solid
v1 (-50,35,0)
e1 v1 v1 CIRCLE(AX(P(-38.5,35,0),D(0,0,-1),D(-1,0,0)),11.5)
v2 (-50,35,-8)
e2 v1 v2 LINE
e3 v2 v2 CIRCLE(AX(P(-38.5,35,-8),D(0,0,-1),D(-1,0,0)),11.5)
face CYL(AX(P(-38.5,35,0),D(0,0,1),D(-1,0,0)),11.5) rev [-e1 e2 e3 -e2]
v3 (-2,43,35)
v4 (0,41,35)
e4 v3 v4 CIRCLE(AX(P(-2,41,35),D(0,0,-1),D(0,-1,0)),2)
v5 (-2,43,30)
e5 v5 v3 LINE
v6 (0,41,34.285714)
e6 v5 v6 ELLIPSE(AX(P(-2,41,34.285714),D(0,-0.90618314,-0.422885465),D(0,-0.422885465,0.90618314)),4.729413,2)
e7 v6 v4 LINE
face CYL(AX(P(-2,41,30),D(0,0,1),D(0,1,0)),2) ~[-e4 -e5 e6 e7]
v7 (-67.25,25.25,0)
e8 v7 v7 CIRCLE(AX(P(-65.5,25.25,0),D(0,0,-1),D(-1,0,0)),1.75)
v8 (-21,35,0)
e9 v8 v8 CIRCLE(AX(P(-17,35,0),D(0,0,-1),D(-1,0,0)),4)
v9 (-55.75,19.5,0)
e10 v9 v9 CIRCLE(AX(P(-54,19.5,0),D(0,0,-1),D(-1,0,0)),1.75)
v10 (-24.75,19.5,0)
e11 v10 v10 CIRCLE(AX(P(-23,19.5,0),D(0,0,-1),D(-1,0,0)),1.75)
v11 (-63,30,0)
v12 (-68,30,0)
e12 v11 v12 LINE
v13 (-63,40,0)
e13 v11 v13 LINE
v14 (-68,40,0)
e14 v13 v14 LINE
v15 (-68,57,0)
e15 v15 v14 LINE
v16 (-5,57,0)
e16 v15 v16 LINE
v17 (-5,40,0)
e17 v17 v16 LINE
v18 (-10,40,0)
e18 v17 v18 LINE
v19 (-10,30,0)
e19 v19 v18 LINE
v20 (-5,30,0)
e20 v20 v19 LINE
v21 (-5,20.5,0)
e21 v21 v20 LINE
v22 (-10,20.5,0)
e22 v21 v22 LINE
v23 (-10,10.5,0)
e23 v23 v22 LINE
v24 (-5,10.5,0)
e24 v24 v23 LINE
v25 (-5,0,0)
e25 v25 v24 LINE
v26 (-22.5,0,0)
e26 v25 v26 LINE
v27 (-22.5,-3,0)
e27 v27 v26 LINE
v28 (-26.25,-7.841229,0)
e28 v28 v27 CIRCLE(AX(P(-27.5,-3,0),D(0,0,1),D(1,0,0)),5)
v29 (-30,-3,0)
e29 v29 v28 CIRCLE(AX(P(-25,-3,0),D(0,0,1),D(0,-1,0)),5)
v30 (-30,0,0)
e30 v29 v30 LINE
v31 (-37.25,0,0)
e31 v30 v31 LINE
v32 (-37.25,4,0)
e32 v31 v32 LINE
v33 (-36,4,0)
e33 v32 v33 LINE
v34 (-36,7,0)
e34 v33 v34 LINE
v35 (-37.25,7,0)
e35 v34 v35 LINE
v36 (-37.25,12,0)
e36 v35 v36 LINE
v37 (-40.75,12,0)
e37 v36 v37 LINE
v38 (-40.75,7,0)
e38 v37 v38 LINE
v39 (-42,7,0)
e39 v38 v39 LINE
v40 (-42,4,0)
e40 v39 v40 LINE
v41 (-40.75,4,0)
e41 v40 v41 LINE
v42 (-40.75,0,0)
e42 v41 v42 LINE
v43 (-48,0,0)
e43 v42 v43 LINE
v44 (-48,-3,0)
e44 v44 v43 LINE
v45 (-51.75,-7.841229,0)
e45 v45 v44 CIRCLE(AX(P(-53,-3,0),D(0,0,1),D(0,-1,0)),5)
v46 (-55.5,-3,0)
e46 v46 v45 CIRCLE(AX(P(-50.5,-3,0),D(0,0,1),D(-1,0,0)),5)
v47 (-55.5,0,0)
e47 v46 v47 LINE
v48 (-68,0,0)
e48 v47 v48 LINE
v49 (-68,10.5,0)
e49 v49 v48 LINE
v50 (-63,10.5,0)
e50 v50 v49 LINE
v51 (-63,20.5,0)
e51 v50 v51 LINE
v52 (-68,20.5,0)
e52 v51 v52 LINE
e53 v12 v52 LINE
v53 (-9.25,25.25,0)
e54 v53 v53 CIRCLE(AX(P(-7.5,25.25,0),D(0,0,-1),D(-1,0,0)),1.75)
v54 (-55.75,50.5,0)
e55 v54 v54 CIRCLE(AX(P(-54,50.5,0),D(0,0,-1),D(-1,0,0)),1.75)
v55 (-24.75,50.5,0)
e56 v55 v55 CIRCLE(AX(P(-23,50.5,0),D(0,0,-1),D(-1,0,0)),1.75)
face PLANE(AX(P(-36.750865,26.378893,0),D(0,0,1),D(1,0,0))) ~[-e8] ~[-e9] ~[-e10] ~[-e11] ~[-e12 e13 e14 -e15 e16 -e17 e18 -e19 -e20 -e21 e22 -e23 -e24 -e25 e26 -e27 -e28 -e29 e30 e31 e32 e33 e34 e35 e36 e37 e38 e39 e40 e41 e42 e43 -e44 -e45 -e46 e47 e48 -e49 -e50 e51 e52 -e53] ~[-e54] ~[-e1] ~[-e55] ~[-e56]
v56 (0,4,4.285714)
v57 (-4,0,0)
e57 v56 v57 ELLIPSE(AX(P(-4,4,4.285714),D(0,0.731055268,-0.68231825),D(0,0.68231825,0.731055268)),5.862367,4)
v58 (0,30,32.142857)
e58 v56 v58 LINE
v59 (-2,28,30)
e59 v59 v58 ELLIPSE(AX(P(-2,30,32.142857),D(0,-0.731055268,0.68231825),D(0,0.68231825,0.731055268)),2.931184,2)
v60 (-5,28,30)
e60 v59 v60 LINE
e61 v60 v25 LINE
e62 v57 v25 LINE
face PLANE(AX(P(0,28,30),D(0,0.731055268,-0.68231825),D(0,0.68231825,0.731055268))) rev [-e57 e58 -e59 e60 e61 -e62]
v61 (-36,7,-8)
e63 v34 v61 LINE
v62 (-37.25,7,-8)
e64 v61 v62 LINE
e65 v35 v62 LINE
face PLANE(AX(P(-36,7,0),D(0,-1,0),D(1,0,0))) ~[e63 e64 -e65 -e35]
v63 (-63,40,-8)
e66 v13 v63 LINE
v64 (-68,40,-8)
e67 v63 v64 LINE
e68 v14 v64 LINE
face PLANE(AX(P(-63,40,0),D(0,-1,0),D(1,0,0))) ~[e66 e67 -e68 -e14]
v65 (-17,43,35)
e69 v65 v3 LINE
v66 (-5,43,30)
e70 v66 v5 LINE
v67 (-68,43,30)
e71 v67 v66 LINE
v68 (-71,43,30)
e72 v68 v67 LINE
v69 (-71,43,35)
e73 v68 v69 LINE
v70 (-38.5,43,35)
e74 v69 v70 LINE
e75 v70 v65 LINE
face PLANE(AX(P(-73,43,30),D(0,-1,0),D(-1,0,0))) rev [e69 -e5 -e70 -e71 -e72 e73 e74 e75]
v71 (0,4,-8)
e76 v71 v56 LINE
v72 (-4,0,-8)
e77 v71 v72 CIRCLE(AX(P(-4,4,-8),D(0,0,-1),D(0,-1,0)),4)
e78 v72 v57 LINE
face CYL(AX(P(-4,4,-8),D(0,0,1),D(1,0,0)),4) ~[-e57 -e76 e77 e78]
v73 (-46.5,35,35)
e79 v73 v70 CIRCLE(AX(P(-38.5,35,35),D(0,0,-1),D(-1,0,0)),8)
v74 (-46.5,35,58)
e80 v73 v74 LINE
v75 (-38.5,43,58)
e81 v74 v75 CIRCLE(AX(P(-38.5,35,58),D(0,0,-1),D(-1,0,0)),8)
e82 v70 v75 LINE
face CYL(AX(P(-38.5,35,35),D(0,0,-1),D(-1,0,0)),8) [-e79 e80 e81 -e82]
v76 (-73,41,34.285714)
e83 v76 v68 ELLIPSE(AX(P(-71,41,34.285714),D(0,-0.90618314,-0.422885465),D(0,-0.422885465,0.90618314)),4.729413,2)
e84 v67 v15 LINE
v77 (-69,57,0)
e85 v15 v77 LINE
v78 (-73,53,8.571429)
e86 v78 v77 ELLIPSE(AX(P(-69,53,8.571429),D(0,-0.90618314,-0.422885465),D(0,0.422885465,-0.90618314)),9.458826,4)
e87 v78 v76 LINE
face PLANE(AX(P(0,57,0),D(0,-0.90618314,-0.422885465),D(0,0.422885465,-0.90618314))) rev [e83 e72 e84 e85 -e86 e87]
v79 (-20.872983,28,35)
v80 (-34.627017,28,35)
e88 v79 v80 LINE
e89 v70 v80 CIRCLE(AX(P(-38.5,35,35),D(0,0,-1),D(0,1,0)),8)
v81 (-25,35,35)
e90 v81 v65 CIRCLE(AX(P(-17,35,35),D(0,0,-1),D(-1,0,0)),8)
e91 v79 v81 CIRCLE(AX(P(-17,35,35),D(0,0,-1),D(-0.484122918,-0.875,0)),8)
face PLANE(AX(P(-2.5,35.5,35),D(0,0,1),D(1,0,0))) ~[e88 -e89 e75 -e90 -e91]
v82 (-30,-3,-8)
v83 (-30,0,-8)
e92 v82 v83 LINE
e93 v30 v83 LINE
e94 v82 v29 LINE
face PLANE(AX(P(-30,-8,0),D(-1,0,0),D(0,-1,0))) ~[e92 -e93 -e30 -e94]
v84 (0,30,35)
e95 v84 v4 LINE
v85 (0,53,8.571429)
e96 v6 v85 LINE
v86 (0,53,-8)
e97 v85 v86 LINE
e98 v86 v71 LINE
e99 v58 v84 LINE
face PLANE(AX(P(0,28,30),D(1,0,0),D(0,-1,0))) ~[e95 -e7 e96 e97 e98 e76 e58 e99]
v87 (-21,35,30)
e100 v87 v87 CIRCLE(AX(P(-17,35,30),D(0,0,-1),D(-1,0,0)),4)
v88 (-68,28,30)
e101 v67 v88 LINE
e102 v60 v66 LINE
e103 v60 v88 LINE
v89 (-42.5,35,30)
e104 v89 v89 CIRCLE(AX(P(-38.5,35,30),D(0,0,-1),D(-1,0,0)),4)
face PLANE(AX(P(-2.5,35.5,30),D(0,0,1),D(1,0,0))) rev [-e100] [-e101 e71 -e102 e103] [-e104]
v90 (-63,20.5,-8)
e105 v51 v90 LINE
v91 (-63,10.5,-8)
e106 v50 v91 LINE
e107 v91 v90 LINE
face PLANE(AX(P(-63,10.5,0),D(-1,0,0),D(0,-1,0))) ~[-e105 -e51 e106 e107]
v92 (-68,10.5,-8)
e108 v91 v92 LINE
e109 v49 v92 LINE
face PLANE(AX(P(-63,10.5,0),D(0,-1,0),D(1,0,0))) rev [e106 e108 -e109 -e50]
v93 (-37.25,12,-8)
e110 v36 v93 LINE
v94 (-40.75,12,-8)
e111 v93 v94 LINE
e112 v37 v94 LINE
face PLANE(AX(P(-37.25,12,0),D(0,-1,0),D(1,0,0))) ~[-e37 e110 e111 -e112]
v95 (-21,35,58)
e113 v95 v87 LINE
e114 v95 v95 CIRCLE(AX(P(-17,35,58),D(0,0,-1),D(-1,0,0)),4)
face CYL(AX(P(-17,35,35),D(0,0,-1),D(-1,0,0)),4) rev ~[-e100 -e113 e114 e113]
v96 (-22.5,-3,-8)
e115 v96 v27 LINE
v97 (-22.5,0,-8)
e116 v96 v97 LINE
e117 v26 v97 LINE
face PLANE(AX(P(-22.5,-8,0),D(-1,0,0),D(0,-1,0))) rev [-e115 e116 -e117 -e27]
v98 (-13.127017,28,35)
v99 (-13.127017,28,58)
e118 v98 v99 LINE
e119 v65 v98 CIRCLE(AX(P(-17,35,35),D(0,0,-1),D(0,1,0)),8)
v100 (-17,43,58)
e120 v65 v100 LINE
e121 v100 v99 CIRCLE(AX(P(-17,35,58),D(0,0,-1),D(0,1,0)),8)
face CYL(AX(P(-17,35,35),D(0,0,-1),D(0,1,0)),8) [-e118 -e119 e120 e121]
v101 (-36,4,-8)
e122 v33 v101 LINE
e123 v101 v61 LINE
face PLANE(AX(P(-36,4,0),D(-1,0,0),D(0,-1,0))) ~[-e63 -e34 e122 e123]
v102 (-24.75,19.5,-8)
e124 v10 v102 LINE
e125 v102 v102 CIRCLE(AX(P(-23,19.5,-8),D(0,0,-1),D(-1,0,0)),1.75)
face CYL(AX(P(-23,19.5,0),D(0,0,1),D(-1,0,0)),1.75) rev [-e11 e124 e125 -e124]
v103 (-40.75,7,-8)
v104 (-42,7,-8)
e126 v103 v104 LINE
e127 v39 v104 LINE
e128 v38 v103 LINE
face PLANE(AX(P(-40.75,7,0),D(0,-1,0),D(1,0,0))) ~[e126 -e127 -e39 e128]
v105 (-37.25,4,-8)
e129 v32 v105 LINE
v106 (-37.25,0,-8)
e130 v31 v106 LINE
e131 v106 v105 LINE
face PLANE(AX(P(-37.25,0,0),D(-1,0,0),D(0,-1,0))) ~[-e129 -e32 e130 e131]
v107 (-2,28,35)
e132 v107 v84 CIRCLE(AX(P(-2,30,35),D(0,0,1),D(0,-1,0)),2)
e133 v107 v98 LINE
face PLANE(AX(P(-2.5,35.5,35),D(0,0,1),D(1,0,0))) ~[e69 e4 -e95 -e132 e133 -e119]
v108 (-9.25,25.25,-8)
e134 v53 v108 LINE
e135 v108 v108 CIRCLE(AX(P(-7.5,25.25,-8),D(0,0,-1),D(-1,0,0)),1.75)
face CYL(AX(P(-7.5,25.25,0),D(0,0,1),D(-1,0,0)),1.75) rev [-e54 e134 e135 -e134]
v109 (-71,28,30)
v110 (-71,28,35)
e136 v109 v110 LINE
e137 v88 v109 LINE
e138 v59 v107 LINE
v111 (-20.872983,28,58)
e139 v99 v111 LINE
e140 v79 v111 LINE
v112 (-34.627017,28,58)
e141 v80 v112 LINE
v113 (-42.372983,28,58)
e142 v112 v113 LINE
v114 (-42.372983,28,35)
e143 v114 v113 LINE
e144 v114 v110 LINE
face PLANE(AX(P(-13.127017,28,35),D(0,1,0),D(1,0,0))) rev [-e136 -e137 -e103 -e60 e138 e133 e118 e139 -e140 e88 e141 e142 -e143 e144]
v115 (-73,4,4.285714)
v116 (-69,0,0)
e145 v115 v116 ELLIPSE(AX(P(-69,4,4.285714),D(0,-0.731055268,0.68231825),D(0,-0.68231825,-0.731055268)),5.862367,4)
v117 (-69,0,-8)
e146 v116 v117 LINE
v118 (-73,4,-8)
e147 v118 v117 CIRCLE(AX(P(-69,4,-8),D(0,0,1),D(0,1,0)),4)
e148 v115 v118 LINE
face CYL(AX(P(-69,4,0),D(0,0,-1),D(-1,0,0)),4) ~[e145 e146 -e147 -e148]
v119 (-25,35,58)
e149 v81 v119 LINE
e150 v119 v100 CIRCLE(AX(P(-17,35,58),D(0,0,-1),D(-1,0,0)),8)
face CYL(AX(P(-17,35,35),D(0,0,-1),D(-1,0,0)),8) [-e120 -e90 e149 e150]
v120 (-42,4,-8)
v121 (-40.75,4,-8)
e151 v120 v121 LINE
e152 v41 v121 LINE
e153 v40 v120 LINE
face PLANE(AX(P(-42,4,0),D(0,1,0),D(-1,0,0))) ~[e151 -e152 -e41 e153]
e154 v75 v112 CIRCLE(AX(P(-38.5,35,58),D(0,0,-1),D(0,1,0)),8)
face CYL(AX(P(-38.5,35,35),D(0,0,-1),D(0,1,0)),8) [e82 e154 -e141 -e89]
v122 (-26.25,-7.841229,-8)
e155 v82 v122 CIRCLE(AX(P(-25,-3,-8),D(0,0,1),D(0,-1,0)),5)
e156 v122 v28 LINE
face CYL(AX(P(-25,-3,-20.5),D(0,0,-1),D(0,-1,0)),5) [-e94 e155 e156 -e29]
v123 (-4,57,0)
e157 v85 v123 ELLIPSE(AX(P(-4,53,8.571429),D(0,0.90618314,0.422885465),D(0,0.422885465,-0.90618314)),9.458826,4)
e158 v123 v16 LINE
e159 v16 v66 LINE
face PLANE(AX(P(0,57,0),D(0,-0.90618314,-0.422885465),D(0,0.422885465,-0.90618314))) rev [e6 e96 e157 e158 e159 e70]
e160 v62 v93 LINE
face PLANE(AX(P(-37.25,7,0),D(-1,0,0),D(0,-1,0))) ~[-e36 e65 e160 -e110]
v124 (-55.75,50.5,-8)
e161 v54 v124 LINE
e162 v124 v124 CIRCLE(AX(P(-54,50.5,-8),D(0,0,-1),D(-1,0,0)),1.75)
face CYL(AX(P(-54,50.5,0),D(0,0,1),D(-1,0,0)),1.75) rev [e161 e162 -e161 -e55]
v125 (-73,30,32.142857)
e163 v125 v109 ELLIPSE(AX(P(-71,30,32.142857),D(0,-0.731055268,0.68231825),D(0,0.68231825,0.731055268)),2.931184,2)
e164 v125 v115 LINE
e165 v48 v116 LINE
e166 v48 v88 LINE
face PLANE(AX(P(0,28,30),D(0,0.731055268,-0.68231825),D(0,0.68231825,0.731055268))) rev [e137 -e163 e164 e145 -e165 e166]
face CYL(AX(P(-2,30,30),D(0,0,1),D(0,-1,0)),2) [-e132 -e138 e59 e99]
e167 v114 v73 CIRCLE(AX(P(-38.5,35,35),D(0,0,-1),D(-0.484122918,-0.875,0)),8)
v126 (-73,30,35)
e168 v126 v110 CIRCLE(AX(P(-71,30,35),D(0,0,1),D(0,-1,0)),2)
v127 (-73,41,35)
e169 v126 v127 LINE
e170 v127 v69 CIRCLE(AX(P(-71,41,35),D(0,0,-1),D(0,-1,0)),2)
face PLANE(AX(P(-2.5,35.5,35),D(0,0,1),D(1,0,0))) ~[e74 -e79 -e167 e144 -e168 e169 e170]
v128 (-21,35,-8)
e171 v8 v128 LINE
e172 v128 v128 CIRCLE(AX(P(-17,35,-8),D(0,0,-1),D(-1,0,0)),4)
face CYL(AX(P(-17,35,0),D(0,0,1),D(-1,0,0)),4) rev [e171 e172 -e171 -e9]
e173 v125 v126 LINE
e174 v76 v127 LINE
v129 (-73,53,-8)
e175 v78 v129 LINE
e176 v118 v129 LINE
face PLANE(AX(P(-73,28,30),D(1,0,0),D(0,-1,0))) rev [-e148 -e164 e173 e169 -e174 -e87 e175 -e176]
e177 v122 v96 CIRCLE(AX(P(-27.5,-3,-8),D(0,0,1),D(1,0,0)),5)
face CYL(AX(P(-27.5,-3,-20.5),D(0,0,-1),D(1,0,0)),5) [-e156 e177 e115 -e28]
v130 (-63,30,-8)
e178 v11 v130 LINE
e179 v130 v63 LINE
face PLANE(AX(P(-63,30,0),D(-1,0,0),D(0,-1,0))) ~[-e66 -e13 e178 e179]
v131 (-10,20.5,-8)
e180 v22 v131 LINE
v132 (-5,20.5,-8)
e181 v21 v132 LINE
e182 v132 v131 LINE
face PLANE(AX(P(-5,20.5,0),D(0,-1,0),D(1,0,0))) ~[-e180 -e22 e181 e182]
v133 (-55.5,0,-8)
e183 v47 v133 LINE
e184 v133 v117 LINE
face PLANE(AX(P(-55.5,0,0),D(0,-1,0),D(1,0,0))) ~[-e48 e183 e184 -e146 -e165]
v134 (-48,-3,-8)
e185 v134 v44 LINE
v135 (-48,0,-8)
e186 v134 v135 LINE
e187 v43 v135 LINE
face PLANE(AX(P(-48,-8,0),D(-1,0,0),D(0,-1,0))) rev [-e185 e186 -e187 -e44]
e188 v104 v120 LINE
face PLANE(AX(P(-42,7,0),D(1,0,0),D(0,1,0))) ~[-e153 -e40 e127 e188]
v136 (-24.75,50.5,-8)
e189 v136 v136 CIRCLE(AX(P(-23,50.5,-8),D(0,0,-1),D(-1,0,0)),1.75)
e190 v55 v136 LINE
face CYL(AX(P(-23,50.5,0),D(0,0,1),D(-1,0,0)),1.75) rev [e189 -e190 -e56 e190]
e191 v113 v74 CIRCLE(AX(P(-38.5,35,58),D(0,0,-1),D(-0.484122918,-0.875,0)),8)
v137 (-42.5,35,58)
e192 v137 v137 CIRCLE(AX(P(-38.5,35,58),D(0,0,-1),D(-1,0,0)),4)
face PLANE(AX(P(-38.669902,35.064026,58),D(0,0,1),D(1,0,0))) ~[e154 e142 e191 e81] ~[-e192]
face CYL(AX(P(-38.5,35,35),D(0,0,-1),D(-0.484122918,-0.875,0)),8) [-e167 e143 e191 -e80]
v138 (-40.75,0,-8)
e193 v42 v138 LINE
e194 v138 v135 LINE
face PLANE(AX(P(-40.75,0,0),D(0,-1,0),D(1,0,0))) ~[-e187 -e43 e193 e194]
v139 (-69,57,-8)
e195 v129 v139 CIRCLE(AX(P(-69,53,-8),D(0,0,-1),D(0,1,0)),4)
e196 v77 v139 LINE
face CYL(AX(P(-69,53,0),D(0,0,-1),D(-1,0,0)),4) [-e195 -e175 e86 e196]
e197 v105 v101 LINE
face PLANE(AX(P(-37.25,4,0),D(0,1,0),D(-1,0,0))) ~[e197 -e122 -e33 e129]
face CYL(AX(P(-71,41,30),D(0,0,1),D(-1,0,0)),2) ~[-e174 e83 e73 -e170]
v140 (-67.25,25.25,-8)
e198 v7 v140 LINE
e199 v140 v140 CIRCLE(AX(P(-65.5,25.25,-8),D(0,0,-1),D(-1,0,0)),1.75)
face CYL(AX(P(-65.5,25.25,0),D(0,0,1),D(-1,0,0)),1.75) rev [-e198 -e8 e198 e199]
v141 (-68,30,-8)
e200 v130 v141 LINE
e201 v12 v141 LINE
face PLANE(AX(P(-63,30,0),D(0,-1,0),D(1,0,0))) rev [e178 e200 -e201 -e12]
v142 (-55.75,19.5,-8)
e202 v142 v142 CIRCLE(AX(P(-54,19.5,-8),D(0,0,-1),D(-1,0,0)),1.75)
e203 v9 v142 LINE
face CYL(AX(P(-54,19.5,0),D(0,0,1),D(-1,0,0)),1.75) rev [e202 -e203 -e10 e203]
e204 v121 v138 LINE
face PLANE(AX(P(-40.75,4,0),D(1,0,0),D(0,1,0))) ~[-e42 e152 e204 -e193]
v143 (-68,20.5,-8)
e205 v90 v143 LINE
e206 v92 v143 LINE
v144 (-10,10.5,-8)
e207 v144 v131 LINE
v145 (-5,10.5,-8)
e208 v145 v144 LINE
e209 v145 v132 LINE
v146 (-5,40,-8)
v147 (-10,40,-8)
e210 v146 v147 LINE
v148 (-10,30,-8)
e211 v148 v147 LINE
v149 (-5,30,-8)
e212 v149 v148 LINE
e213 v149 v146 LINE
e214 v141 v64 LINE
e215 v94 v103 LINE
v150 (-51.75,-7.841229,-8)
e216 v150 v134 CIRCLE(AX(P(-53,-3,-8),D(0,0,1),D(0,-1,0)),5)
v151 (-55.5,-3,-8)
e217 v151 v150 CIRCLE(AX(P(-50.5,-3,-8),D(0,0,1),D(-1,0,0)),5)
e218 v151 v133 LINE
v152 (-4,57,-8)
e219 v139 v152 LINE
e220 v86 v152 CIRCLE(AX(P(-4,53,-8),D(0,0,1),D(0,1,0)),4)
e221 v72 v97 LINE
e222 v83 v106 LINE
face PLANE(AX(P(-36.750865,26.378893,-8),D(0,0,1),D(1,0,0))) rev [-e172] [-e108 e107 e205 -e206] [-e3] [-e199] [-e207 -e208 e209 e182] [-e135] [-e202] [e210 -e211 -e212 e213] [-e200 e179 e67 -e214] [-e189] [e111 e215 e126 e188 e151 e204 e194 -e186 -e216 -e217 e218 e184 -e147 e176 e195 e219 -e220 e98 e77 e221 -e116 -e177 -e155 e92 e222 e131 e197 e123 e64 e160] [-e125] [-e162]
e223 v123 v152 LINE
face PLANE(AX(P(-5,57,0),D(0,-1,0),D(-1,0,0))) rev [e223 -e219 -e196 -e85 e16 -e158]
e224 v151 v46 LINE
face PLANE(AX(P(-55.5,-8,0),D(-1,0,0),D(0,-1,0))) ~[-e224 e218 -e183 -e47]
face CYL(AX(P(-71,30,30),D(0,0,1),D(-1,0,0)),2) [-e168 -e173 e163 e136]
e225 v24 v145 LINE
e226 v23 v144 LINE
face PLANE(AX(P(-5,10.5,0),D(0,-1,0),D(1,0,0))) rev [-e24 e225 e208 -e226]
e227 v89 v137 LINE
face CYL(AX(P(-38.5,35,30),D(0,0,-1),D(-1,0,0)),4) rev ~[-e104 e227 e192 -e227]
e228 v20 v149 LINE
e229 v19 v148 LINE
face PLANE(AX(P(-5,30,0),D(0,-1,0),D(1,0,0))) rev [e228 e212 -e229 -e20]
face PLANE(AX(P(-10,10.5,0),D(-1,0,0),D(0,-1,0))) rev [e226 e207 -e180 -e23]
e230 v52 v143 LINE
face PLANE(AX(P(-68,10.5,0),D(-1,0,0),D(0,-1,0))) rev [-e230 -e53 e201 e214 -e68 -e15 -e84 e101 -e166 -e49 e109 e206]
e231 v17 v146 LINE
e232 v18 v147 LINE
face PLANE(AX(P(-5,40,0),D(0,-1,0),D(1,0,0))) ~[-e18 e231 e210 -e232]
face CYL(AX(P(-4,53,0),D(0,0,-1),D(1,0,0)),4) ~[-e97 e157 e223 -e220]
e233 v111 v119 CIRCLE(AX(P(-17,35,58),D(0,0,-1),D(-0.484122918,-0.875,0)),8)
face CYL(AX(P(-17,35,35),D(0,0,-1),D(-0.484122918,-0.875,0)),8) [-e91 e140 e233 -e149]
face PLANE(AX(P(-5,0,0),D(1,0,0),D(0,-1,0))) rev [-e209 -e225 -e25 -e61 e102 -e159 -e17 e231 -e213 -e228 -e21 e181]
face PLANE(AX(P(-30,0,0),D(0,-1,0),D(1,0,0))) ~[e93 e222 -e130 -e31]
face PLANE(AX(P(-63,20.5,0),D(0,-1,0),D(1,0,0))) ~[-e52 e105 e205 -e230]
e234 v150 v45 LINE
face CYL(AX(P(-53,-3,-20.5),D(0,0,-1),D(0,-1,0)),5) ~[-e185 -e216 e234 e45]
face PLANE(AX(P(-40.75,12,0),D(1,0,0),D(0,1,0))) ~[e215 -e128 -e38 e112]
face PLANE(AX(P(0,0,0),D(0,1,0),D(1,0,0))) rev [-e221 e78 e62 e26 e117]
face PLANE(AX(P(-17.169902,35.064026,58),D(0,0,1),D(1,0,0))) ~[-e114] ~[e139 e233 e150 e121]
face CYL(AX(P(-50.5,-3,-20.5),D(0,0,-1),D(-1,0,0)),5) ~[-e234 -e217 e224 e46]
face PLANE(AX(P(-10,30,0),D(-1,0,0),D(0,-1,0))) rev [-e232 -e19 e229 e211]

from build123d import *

# Parameters (mm, degrees)
F0_W         = 5
F0_H         = 10
F0_R         = 1.75
F0_R_2       = 4
F0_R_3       = 11.5
F0_W_2       = 7.5
F0_H_2       = 8
F1_DEPTH     = 8
F3_DEPTH     = 30
F4_W         = 5
F4_H         = 15
F4_W_2       = 63
F4_R         = 4
F5_DEPTH     = 5
F6_R         = 4
F7_DEPTH     = 23
F9_DEPTH     = 73
F10_R        = 4
F11_R        = 2
F12_T1_DEPTH = 33


# Not quite as in the source:
# - a fillet or chamfer that OpenCascade refuses, or shapes differently, is made with other operations: its cross-section is extruded or revolved along the edge and cut away or added


with BuildPart() as f1:
    # F0 (on Top) → F1 (new body)
    with BuildSketch(Plane.XY):
        Polygon((0, 57), (0, 0), (22.5, 0), (30, 0), (37.25, 0), (37.25, 4), (36, 4), (36, 7), (37.25, 7), (37.25, 12), (40.75, 12), (40.75, 7), (42, 7), (42, 4), (40.75, 4), (40.75, 0), (48, 0), (55.5, 0), (73, 0), (73, 57), align=None)
        with Locations((7.5, 15.5)):
            Rectangle(F0_W, F0_H, mode=Mode.SUBTRACT)
        with Locations((23, 19.5)):
            Circle(F0_R, mode=Mode.SUBTRACT)
        with Locations((54, 19.5)):
            Circle(F0_R, mode=Mode.SUBTRACT)
        with Locations((65.5, 15.5)):
            Rectangle(F0_W, F0_H, mode=Mode.SUBTRACT)
        with Locations((7.5, 25.25)):
            Circle(F0_R, mode=Mode.SUBTRACT)
        with Locations((7.5, 35)):
            Rectangle(F0_W, F0_H, mode=Mode.SUBTRACT)
        with Locations((17, 35)):
            Circle(F0_R_2, mode=Mode.SUBTRACT)
        with Locations((23, 50.5)):
            Circle(F0_R, mode=Mode.SUBTRACT)
        with Locations((38.5, 35)):
            Circle(F0_R_3, mode=Mode.SUBTRACT)
        with Locations((65.5, 25.25)):
            Circle(F0_R, mode=Mode.SUBTRACT)
        with Locations((65.5, 35)):
            Rectangle(F0_W, F0_H, mode=Mode.SUBTRACT)
        with Locations((54, 50.5)):
            Circle(F0_R, mode=Mode.SUBTRACT)
        with Locations((51.75, -4)):
            Rectangle(F0_W_2, F0_H_2)
        with Locations((26.25, -4)):
            Rectangle(F0_W_2, F0_H_2)
    extrude(amount=-F1_DEPTH)

    # F2 (on Top) → F3 (join)
    with BuildSketch(Plane.XY):
        Polygon((0, 57), (0, 0), (5, 0), (5, 10.5), (5, 20.5), (5, 30), (5, 40), (5, 57), align=None)
        Polygon((73, 57), (68, 57), (68, 40), (68, 30), (68, 20.5), (68, 10.5), (68, 0), (73, 0), align=None)
    extrude(amount=F3_DEPTH)

    # F4 (on face) → F5 (join)
    with BuildSketch(Plane.XY.offset(30)):
        with Locations((2.5, 35.5)):
            Rectangle(F4_W, F4_H)
        with Locations((36.5, 35.5)):
            Rectangle(F4_W_2, F4_H)
        with Locations((17, 35)):
            Circle(F4_R, mode=Mode.SUBTRACT)
        with Locations((38.5, 35)):
            Circle(F4_R, mode=Mode.SUBTRACT)
        with Locations((70.5, 35.5)):
            Rectangle(F4_W, F4_H)
    extrude(amount=F5_DEPTH)

    # F6 (on face) → F7 (join)
    with BuildSketch(Plane.XY.offset(35)):
        with BuildLine():
            ThreePointArc((25, 35), (22.6568542495, 40.6568542495), (17, 43))
            ThreePointArc((17, 43), (9.2540333076, 37), (13.1270166538, 28))
            Line((13.1270166538, 28), (20.8729833462, 28))
            ThreePointArc((20.8729833462, 28), (23.8914391374, 30.9369879873), (25, 35))
        make_face()
        with Locations((17, 35)):
            Circle(F6_R, mode=Mode.SUBTRACT)
        with BuildLine():
            ThreePointArc((46.5, 35), (44.1568542495, 40.6568542495), (38.5, 43))
            ThreePointArc((38.5, 43), (30.7540333076, 37), (34.6270166538, 28))
            Line((34.6270166538, 28), (42.3729833462, 28))
            ThreePointArc((42.3729833462, 28), (45.3914391374, 30.9369879873), (46.5, 35))
        make_face()
        with Locations((38.5, 35)):
            Circle(F6_R, mode=Mode.SUBTRACT)
    extrude(amount=F7_DEPTH)

    # F8 (on face) → F9 (cut)
    with BuildSketch(Plane(origin=(0, 0, 0), x_dir=(0, -1, 0), z_dir=(-1, 0, 0))):
        Polygon((-57, 0), (-43, 30), (-57, 30), align=None)
        Polygon((0, 30), (-28, 30), (0, 0), align=None)
    extrude(amount=-F9_DEPTH, mode=Mode.SUBTRACT)

    # F10
    f10_edges = [f1.edges().sort_by_distance(p)[0] for p in [
        (0, 57, -4),
        (73, 57, -4),
        (0, 0, -4),
        (73, 0, -4),
    ]]
    fillet(f10_edges, radius=F10_R)

    # F11
    f11_edges = [f1.edges().sort_by_distance(p)[0] for p in [
        (73, 28, 32.5),
        (0, 28, 32.5),
        (0, 43, 32.5),
        (73, 43, 32.5),
    ]]
    fillet(f11_edges, radius=F11_R)

    # F12: fillet of radius 5 on 4 edges, made by hand

    # F12_s2 → F12_t1 (cut)
    with BuildSketch(Plane.XY.offset(-20.5)):
        with BuildLine():
            ThreePointArc((25, -8), (28.5355339059, -6.5355339059), (30, -3))
            Line((30, -3), (30, -8))
            Line((30, -8), (25, -8))
        make_face()
        with BuildLine():
            ThreePointArc((22.5, -3), (23.9644660941, -6.5355339059), (27.5, -8))
            Line((27.5, -8), (22.5, -8))
            Line((22.5, -8), (22.5, -3))
        make_face()
        with BuildLine():
            ThreePointArc((55.5, -3), (54.0355339059, -6.5355339059), (50.5, -8))
            Line((50.5, -8), (55.5, -8))
            Line((55.5, -8), (55.5, -3))
        make_face()
        with BuildLine():
            ThreePointArc((53, -8), (49.4644660941, -6.5355339059), (48, -3))
            Line((48, -3), (48, -8))
            Line((48, -8), (53, -8))
        make_face()
    extrude(amount=F12_T1_DEPTH, mode=Mode.SUBTRACT)


with BuildPart() as f13_1:
    # F13: instance of F1
    add(f1.part.mirror(Plane(origin=(0, 30.6667140421, 8.8934527193), x_dir=(0, -1, 0), z_dir=(-1, 0, 0))))


solid = f13_1.part
